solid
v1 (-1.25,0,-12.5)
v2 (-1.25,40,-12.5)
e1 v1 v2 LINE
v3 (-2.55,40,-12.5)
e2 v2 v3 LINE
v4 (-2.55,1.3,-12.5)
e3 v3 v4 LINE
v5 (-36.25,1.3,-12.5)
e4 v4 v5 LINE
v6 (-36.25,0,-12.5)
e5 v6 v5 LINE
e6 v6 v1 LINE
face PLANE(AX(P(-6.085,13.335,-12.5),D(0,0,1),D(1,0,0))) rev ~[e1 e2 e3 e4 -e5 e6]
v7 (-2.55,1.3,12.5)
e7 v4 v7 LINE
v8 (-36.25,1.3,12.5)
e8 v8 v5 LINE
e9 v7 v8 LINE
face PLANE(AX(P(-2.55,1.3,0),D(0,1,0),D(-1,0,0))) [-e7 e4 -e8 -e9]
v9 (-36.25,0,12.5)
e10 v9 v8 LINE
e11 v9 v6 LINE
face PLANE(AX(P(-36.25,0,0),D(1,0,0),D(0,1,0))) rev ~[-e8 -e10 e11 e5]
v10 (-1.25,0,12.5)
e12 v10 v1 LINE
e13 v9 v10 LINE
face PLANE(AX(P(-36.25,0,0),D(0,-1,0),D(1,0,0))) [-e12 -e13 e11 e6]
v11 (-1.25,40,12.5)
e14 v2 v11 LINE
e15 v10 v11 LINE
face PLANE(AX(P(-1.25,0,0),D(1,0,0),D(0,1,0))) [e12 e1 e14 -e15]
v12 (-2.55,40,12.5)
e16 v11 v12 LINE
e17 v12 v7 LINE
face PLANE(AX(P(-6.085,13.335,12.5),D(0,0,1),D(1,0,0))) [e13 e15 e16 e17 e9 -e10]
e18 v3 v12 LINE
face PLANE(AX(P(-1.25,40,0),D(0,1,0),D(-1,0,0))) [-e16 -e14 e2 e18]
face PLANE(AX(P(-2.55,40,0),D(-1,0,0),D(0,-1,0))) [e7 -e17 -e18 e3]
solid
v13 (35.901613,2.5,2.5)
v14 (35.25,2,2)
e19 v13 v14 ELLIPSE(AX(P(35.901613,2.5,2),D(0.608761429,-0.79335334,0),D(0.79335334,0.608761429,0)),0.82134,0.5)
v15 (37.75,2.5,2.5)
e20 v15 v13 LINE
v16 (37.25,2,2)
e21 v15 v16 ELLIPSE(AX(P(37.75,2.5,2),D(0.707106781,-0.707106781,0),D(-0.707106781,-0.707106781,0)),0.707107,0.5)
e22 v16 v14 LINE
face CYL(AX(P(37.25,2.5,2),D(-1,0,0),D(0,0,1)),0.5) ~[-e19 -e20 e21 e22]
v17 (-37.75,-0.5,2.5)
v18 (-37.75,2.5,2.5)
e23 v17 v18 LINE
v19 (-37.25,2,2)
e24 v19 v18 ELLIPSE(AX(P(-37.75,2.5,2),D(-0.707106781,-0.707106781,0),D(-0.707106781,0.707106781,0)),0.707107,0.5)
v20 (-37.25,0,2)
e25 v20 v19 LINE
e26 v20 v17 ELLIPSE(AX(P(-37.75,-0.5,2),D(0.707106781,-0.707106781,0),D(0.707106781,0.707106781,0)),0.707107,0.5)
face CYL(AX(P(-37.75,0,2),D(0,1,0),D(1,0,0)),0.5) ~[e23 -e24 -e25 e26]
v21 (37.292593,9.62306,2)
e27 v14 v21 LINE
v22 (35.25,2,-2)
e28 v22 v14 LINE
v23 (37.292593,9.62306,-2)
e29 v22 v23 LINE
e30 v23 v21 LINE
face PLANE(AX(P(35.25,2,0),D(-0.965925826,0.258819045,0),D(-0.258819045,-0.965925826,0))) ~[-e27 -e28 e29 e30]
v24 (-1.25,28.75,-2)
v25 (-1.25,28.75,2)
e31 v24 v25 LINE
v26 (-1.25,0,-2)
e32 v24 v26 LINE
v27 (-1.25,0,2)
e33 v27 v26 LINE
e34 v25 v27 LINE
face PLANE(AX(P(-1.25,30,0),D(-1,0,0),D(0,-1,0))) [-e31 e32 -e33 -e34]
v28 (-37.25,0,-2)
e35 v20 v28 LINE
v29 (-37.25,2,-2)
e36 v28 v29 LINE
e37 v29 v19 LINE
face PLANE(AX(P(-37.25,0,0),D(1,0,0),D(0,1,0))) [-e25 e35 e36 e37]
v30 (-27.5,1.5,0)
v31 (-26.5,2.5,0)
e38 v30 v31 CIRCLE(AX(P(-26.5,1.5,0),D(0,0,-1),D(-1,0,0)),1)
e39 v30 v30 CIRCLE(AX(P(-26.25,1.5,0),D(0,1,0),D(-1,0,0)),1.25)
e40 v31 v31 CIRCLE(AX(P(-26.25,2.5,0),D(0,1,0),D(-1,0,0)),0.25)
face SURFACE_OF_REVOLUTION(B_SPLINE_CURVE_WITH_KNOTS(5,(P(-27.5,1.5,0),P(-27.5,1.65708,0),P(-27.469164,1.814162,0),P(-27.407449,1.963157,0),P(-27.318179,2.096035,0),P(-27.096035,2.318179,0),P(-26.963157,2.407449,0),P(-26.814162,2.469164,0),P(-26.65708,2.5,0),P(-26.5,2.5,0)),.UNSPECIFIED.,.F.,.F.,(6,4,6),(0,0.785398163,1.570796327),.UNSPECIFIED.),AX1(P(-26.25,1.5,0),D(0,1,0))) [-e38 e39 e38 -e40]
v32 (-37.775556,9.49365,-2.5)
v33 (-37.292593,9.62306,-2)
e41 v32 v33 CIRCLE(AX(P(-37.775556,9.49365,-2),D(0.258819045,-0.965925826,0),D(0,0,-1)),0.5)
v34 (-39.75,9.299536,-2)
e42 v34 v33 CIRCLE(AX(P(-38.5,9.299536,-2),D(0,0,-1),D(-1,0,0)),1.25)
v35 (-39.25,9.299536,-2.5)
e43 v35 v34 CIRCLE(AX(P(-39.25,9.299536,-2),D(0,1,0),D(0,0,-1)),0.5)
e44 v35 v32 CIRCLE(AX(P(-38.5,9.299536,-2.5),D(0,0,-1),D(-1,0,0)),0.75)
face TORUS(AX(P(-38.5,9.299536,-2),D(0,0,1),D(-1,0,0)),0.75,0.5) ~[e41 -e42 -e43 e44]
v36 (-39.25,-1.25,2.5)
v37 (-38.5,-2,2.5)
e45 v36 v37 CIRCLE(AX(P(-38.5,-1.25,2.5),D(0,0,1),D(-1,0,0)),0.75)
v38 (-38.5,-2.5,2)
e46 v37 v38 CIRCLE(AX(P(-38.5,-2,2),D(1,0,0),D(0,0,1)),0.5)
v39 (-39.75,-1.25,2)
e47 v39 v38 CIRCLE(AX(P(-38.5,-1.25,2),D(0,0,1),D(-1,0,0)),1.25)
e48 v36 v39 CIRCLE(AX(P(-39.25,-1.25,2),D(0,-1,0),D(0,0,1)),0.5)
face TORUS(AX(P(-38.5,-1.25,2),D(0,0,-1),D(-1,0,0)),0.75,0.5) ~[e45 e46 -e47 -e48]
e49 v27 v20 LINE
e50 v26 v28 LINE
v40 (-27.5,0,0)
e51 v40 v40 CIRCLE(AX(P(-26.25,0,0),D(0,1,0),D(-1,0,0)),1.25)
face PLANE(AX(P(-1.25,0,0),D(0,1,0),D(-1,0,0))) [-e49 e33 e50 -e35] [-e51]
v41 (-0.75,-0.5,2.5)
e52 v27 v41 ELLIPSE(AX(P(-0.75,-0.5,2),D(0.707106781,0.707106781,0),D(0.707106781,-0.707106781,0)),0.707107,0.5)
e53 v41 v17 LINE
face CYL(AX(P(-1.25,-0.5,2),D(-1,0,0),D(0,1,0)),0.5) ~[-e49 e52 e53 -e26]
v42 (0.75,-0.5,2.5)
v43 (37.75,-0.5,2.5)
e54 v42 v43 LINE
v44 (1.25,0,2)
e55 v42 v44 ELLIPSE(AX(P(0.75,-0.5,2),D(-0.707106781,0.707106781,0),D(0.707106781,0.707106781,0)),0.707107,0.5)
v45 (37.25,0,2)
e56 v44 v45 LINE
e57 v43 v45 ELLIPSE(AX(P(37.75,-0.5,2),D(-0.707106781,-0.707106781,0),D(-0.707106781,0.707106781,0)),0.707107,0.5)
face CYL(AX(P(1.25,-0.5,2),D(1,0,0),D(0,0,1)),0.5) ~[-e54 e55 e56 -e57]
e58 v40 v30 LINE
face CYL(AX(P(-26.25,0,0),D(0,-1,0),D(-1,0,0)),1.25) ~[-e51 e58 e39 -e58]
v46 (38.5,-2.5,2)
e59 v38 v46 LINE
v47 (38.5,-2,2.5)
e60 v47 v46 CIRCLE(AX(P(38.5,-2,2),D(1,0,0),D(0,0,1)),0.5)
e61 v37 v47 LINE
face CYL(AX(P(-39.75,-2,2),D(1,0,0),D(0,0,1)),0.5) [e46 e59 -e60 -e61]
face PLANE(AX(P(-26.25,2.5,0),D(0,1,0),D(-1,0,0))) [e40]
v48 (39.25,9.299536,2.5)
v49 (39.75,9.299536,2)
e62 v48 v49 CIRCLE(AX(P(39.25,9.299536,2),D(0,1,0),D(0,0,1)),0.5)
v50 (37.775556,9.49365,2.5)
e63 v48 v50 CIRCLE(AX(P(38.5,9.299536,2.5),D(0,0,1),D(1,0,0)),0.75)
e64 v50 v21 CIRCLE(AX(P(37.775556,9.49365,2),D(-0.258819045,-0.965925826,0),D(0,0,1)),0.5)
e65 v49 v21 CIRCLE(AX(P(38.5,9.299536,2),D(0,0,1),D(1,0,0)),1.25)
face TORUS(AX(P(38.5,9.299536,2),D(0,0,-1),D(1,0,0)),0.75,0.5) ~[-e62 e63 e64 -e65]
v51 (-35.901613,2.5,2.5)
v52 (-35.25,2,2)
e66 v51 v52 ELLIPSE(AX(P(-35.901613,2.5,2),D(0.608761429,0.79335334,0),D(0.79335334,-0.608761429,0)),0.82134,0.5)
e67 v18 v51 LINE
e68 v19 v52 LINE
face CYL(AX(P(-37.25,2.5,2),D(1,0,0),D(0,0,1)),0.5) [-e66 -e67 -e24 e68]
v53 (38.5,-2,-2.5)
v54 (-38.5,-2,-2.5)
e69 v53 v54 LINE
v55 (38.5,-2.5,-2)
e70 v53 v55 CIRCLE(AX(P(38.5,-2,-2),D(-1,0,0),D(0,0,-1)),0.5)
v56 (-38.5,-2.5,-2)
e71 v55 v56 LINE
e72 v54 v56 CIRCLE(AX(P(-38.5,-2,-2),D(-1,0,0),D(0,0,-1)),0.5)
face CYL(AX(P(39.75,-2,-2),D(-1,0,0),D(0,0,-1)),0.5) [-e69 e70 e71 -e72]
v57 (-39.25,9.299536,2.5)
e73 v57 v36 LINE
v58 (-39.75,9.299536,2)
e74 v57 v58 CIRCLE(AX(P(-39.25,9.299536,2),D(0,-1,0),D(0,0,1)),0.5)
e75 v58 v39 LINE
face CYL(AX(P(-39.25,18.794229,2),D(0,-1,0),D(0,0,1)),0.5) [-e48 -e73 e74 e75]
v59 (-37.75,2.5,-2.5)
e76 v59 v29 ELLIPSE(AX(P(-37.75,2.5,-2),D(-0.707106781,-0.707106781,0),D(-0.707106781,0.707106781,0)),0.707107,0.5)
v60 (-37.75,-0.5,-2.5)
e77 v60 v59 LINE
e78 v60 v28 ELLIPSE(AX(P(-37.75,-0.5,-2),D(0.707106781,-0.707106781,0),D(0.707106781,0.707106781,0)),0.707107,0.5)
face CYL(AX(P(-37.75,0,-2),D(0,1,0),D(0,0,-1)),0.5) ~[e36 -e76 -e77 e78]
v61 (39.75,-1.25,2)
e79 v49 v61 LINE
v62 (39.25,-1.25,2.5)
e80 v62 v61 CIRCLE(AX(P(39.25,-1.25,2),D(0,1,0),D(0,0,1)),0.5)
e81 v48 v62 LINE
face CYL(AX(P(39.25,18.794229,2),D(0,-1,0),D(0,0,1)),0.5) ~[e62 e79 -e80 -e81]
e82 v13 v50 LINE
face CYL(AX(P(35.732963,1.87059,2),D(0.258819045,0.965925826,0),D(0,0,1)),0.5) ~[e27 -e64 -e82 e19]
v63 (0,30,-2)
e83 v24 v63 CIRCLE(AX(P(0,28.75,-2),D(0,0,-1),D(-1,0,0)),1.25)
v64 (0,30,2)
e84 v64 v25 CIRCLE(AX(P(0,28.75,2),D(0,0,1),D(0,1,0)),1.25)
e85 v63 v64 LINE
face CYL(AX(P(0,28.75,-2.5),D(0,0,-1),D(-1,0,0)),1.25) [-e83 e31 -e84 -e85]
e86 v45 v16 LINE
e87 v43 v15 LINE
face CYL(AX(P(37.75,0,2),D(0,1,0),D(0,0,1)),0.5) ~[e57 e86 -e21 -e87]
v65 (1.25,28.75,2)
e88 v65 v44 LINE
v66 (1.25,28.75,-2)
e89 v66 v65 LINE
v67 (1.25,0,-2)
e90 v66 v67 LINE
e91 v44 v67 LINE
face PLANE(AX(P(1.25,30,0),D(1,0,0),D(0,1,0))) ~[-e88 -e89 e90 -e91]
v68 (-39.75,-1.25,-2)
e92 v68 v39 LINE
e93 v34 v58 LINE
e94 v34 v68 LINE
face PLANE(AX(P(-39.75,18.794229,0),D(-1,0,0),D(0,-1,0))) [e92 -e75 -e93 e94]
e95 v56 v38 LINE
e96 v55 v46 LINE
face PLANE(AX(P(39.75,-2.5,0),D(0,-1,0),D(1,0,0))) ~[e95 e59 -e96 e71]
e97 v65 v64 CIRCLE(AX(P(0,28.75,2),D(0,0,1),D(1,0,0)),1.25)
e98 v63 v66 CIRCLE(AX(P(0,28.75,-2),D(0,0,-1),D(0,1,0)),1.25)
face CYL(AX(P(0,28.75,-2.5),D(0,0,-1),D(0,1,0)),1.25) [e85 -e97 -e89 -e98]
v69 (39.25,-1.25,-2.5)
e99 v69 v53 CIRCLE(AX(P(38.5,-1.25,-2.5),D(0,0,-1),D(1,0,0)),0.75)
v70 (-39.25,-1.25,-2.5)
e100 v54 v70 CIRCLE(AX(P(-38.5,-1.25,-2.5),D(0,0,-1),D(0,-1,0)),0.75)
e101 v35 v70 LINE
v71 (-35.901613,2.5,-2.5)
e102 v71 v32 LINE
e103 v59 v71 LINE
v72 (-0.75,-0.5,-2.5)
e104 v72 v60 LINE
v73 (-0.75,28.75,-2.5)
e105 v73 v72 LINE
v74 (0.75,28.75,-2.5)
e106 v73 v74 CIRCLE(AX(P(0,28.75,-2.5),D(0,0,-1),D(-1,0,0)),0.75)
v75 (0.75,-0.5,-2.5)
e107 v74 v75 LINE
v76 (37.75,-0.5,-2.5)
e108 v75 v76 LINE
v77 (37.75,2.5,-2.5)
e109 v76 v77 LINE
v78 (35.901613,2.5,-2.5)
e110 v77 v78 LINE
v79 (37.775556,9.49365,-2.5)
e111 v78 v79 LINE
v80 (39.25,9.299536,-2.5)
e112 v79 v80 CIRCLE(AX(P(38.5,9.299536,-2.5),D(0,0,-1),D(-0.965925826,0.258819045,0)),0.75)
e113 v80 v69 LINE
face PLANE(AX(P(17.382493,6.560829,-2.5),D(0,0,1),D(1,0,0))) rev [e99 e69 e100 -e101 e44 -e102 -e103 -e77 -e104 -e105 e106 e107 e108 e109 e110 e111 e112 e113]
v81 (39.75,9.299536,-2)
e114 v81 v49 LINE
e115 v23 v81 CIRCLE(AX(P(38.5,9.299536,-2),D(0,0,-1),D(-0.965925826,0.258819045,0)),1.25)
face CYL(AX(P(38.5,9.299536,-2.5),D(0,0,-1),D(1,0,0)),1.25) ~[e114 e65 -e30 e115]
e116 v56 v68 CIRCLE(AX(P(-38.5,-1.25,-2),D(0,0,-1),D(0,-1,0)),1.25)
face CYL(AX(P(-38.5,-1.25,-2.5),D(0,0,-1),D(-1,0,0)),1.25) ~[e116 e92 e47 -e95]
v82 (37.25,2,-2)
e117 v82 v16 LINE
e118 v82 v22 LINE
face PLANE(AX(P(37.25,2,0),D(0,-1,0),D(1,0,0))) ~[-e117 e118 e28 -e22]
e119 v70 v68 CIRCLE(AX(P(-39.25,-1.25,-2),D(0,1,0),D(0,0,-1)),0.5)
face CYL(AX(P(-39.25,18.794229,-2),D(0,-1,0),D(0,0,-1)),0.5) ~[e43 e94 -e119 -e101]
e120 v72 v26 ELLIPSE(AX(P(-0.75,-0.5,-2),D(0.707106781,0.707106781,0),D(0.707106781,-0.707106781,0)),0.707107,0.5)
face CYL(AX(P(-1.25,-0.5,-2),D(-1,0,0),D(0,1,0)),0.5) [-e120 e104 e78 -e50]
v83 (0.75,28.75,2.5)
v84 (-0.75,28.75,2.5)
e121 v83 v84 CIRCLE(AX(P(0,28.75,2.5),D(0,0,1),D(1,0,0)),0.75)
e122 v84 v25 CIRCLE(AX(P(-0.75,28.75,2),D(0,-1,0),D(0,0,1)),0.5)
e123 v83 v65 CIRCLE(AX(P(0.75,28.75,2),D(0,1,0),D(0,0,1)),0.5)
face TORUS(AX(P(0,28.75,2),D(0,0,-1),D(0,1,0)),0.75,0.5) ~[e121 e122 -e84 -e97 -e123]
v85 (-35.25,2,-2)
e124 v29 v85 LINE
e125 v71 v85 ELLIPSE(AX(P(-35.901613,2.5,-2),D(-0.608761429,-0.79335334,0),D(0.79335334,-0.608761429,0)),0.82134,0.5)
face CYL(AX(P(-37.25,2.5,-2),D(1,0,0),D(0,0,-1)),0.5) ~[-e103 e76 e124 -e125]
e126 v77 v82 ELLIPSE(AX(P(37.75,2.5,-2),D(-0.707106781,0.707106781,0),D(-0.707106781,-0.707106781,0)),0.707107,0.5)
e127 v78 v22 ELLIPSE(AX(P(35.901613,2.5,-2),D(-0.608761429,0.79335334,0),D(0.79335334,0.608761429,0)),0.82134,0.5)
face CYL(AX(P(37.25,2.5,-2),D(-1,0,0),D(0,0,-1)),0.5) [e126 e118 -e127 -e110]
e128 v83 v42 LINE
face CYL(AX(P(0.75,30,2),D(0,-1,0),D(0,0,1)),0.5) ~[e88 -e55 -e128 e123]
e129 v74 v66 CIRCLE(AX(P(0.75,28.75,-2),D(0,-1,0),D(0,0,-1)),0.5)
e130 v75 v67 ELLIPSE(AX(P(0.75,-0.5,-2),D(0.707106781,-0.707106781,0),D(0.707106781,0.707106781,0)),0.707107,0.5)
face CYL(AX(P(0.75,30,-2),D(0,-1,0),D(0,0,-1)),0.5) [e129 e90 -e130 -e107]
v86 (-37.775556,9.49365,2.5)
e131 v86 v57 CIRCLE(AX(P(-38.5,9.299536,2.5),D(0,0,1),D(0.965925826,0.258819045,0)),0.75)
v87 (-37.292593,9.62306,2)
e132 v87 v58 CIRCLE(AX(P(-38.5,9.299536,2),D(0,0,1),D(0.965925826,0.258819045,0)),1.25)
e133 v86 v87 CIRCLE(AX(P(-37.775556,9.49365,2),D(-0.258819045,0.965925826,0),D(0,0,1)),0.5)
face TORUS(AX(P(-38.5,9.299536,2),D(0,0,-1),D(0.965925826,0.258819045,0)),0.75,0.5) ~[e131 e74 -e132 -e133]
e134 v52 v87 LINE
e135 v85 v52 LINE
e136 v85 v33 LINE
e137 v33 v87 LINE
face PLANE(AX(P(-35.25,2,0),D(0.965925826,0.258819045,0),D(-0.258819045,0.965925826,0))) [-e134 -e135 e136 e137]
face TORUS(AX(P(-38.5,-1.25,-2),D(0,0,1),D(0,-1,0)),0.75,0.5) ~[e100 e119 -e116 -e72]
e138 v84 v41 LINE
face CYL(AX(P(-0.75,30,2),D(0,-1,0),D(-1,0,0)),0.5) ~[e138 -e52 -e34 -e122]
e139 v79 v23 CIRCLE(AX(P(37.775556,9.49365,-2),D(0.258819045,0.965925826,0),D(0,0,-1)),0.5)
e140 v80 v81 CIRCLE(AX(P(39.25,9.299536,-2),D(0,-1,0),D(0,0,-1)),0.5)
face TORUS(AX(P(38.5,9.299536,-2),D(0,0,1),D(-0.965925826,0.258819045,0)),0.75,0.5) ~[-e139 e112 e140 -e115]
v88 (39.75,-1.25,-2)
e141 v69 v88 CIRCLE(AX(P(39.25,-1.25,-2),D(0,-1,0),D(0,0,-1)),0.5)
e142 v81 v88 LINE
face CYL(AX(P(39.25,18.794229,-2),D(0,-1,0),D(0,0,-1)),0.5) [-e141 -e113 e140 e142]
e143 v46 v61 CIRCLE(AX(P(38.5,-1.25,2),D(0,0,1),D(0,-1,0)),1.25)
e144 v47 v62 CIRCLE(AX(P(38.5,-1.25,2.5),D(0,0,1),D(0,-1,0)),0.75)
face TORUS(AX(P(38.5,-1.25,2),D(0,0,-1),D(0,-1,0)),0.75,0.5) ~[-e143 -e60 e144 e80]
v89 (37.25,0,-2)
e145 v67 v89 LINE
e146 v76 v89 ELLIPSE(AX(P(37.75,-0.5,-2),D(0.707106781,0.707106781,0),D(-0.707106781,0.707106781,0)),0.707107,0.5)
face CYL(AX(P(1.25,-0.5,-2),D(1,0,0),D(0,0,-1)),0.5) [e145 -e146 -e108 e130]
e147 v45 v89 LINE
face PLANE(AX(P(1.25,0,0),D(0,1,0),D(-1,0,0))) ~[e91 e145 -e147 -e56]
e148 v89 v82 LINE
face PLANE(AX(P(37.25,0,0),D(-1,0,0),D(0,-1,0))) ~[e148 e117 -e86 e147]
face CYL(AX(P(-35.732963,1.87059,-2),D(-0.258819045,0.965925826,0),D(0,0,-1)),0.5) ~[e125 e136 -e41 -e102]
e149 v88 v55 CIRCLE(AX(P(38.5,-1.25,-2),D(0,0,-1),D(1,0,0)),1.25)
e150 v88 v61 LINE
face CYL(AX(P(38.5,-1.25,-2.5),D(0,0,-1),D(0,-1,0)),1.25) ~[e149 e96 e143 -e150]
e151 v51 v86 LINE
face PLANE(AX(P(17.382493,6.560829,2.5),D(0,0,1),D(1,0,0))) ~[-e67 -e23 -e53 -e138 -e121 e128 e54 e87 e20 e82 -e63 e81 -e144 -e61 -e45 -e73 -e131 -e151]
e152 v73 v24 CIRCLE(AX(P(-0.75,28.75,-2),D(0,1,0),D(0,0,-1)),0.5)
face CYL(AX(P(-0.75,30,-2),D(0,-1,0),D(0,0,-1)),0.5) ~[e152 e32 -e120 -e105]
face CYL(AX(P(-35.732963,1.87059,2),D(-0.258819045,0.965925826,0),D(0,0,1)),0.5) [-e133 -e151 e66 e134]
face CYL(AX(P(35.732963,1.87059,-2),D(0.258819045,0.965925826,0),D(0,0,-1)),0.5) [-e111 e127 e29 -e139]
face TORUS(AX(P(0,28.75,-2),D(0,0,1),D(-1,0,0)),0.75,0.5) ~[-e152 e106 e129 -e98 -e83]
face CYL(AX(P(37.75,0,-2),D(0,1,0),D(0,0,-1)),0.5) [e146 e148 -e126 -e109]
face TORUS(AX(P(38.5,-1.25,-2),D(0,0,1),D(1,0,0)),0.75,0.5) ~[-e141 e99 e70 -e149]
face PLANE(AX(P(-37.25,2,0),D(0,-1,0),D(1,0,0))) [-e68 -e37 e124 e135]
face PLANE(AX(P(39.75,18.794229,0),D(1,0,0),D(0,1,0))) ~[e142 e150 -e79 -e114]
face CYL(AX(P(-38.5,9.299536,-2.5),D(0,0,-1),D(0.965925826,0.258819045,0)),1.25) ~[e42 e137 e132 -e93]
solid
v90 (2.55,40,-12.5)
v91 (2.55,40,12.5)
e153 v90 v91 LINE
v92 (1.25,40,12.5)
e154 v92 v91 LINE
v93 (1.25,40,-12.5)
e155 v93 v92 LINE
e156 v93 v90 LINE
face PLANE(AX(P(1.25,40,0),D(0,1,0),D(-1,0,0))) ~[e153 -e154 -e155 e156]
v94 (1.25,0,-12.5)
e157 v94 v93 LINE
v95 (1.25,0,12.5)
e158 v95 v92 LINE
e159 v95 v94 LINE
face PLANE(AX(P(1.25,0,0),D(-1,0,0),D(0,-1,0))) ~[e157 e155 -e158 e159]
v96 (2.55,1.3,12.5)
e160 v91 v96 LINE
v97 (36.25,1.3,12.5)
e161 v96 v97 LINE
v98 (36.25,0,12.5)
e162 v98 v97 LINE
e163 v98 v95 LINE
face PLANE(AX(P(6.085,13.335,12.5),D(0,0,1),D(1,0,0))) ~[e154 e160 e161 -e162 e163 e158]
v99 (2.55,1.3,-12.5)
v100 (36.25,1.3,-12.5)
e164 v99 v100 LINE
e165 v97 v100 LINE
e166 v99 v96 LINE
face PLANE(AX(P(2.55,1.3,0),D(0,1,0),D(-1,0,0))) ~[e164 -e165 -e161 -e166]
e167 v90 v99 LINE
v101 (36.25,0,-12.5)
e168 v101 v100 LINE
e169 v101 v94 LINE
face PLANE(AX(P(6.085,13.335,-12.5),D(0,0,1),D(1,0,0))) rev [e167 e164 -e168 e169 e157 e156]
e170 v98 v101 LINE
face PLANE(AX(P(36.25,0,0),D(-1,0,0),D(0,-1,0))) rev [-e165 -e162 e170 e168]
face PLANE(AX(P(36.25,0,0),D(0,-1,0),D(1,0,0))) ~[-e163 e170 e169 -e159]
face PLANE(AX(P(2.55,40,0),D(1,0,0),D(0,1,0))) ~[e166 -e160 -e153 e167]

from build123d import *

# Parameters (mm, degrees)
F2_DEPTH     = 2.5
F4_R         = 1.25
F5_DEPTH     = 2.5
F6_R         = 1
F7_R         = 0.5
F8_T1_DEPTH  = 5
F8_T4_ANGLE  = 90
F8_T6_ANGLE  = 90
F8_T8_ANGLE  = 90
F8_T10_ANGLE = 90
F8_T12_ANGLE = 165
F8_T14_ANGLE = 165
F8_T16_ANGLE = 165
F8_T18_ANGLE = 165
F8_T20_ANGLE = 90
F8_T22_ANGLE = 90
F8_T24_ANGLE = 90
F8_T26_ANGLE = 90
F0_W         = 8
F0_H         = 1.3
F0_W_2       = 4
F9_DEPTH     = 12.5


# Not quite as in the source:
# - a fillet or chamfer that OpenCascade refuses, or shapes differently, is made with other operations: its cross-section is extruded or revolved along the edge and cut away or added


with BuildPart() as f2:
    # F1 (on Top) → F2 (new body, symmetric)
    with BuildSketch(Plane.XY):
        Polygon((-37.25, 0), (-37.25, 2), (-35.25, 2), (-39.75, 18.7942286341), (-39.75, -2.5), (0, -2.5), (0, 30), (-1.25, 30), (-1.25, 0), align=None)
    extrude(amount=F2_DEPTH, both=True)

    # F3: F2 across plane


with BuildPart() as f2_1:
    add(f2.part)
    add(f2.part.mirror(Plane.YZ))

    # F4 (on face) → F5 (join)
    with BuildSketch(Plane(origin=(0, 0, 0), x_dir=(-1, 0, 0), z_dir=(0, 1, 0))):
        with Locations((26.25, 0)):
            Circle(F4_R)
    extrude(amount=F5_DEPTH)

    # F6
    f6_edges = [f2_1.edges().sort_by_distance(p)[0] for p in [
        (-25, 2.5, 0),
    ]]
    fillet(f6_edges, radius=F6_R)

    # F7
    f7_edges = [f2_1.edges().sort_by_distance(p)[0] for p in [
        (-37.25, 1, -2.5),
        (-36.25, 2, -2.5),
        (-37.5, 10.397114, -2.5),
        (-39.75, 8.147114, -2.5),
        (0, -2.5, -2.5),
        (39.75, 8.147114, -2.5),
        (37.5, 10.397114, -2.5),
        (36.25, 2, -2.5),
        (37.25, 1, -2.5),
        (19.25, 0, -2.5),
        (1.25, 15, -2.5),
        (0, 30, -2.5),
        (-1.25, 15, -2.5),
        (-19.25, 0, -2.5),
        (-37.25, 1, 2.5),
        (-36.25, 2, 2.5),
        (-37.5, 10.397114, 2.5),
        (-39.75, 8.147114, 2.5),
        (0, -2.5, 2.5),
        (39.75, 8.147114, 2.5),
        (37.5, 10.397114, 2.5),
        (36.25, 2, 2.5),
        (37.25, 1, 2.5),
        (19.25, 0, 2.5),
        (1.25, 15, 2.5),
        (0, 30, 2.5),
        (-1.25, 15, 2.5),
        (-19.25, 0, 2.5),
    ]]
    fillet(f7_edges, radius=F7_R)

    # F8: fillet of radius 1.25 on 6 edges, made by hand

    # F8_s2 → F8_t1 (cut)
    with BuildSketch(Plane.XY.offset(-2.5)):
        with BuildLine():
            ThreePointArc((0, 30), (0.8838834765, 29.6338834765), (1.25, 28.75))
            Line((1.25, 28.75), (1.25, 30))
            Line((1.25, 30), (0, 30))
        make_face()
        with BuildLine():
            ThreePointArc((-1.25, 28.75), (-0.8838834765, 29.6338834765), (0, 30))
            Line((0, 30), (-1.25, 30))
            Line((-1.25, 30), (-1.25, 28.75))
        make_face()
        with BuildLine():
            ThreePointArc((-37.2925927171, 9.6230597995), (-38.6631577403, 10.5388420699), (-39.75, 9.2995359932))
            Line((-39.75, 9.2995359932), (-39.75, 18.7942286341))
            Line((-39.75, 18.7942286341), (-37.2925927171, 9.6230597995))
        make_face()
        with BuildLine():
            ThreePointArc((39.75, 9.2995359932), (38.6631577403, 10.5388420699), (37.2925927171, 9.6230597995))
            Line((37.2925927171, 9.6230597995), (39.75, 18.7942286341))
            Line((39.75, 18.7942286341), (39.75, 9.2995359932))
        make_face()
        with BuildLine():
            ThreePointArc((38.5, -2.5), (39.3838834765, -2.1338834765), (39.75, -1.25))
            Line((39.75, -1.25), (39.75, -2.5))
            Line((39.75, -2.5), (38.5, -2.5))
        make_face()
        with BuildLine():
            ThreePointArc((-39.75, -1.25), (-39.3838834765, -2.1338834765), (-38.5, -2.5))
            Line((-38.5, -2.5), (-39.75, -2.5))
            Line((-39.75, -2.5), (-39.75, -1.25))
        make_face()
    extrude(amount=F8_T1_DEPTH, mode=Mode.SUBTRACT)

    # F8_s3 → F8_t4 (revolve, cut)
    with BuildSketch(Plane.YZ.offset(-38.5)):
        with BuildLine():
            ThreePointArc((-2, -2.5), (-2.3535533906, -2.3535533906), (-2.5, -2))
            Line((-2.5, -2), (-2.5, -2.5))
            Line((-2.5, -2.5), (-2, -2.5))
        make_face()
    revolve(axis=Axis((-38.5, -1.25, -2.5), (0, 0, -1)), revolution_arc=F8_T4_ANGLE, mode=Mode.SUBTRACT)

    # F8_s5 → F8_t6 (revolve, cut)
    with BuildSketch(Plane.XZ.offset(1.25)):
        with BuildLine():
            ThreePointArc((-39.25, 2.5), (-39.6035533906, 2.3535533906), (-39.75, 2))
            Line((-39.75, 2), (-39.75, 2.5))
            Line((-39.75, 2.5), (-39.25, 2.5))
        make_face()
    revolve(axis=Axis((-38.5, -1.25, 2.5), (0, 0, 1)), revolution_arc=F8_T6_ANGLE, mode=Mode.SUBTRACT)

    # F8_s7 → F8_t8 (revolve, cut)
    with BuildSketch(Plane.XZ.offset(1.25)):
        with BuildLine():
            ThreePointArc((39.25, -2.5), (39.6035533906, -2.3535533906), (39.75, -2))
            Line((39.75, -2), (39.75, -2.5))
            Line((39.75, -2.5), (39.25, -2.5))
        make_face()
    revolve(axis=Axis((38.5, -1.25, -2.5), (0, 0, -1)), revolution_arc=F8_T8_ANGLE, mode=Mode.SUBTRACT)

    # F8_s9 → F8_t10 (revolve, cut)
    with BuildSketch(Plane.YZ.offset(38.5)):
        with BuildLine():
            ThreePointArc((-2, 2.5), (-2.3535533906, 2.3535533906), (-2.5, 2))
            Line((-2.5, 2), (-2.5, 2.5))
            Line((-2.5, 2.5), (-2, 2.5))
        make_face()
    revolve(axis=Axis((38.5, -1.25, 2.5), (0, 0, 1)), revolution_arc=F8_T10_ANGLE, mode=Mode.SUBTRACT)

    # F8_s11 → F8_t12 (revolve, cut)
    with BuildSketch(Plane(origin=(4.9038949754, 18.3015852033, 0), x_dir=(0, 0, 1), z_dir=(-0.2588190451, -0.9659258263, 0))):
        with BuildLine():
            ThreePointArc((-2.5, -34.0312472865), (-2.3535533906, -33.6776938959), (-2, -33.5312472865))
            Line((-2, -33.5312472865), (-2.5, -33.5312472865))
            Line((-2.5, -33.5312472865), (-2.5, -34.0312472865))
        make_face()
    revolve(axis=Axis((38.5, 9.2995359932, -2.5), (0, 0, -1)), revolution_arc=F8_T12_ANGLE, mode=Mode.SUBTRACT)

    # F8_s13 → F8_t14 (revolve, cut)
    with BuildSketch(Plane.XZ.offset(-9.2995359932)):
        with BuildLine():
            ThreePointArc((39.25, 2.5), (39.6035533906, 2.3535533906), (39.75, 2))
            Line((39.75, 2), (39.75, 2.5))
            Line((39.75, 2.5), (39.25, 2.5))
        make_face()
    revolve(axis=Axis((38.5, 9.2995359932, 2.5), (0, 0, 1)), revolution_arc=F8_T14_ANGLE, mode=Mode.SUBTRACT)

    # F8_s15 → F8_t16 (revolve, cut)
    with BuildSketch(Plane.XZ.offset(-9.2995359932)):
        with BuildLine():
            ThreePointArc((-39.25, -2.5), (-39.6035533906, -2.3535533906), (-39.75, -2))
            Line((-39.75, -2), (-39.75, -2.5))
            Line((-39.75, -2.5), (-39.25, -2.5))
        make_face()
    revolve(axis=Axis((-38.5, 9.2995359932, -2.5), (0, 0, -1)), revolution_arc=F8_T16_ANGLE, mode=Mode.SUBTRACT)

    # F8_s17 → F8_t18 (revolve, cut)
    with BuildSketch(Plane(origin=(-4.9038949754, 18.3015852033, 0), x_dir=(0, 0, 1), z_dir=(0.2588190451, -0.9659258263, 0))):
        with BuildLine():
            ThreePointArc((2.5, 34.0312472865), (2.3535533906, 33.6776938959), (2, 33.5312472865))
            Line((2, 33.5312472865), (2.5, 33.5312472865))
            Line((2.5, 33.5312472865), (2.5, 34.0312472865))
        make_face()
    revolve(axis=Axis((-38.5, 9.2995359932, 2.5), (0, 0, 1)), revolution_arc=F8_T18_ANGLE, mode=Mode.SUBTRACT)

    # F8_s19 → F8_t20 (revolve, cut)
    with BuildSketch(Plane.YZ):
        with BuildLine():
            ThreePointArc((29.5, 2.5), (29.8535533906, 2.3535533906), (30, 2))
            Line((30, 2), (30, 2.5))
            Line((30, 2.5), (29.5, 2.5))
        make_face()
    revolve(axis=Axis((0, 28.75, 2.5), (0, 0, 1)), revolution_arc=F8_T20_ANGLE, mode=Mode.SUBTRACT)

    # F8_s21 → F8_t22 (revolve, cut)
    with BuildSketch(Plane.XZ.offset(-28.75)):
        with BuildLine():
            ThreePointArc((-0.75, -2.5), (-1.1035533906, -2.3535533906), (-1.25, -2))
            Line((-1.25, -2), (-1.25, -2.5))
            Line((-1.25, -2.5), (-0.75, -2.5))
        make_face()
    revolve(axis=Axis((0, 28.75, -2.5), (0, 0, -1)), revolution_arc=F8_T22_ANGLE, mode=Mode.SUBTRACT)

    # F8_s23 → F8_t24 (revolve, cut)
    with BuildSketch(Plane.XZ.offset(-28.75)):
        with BuildLine():
            ThreePointArc((0.75, 2.5), (1.1035533906, 2.3535533906), (1.25, 2))
            Line((1.25, 2), (1.25, 2.5))
            Line((1.25, 2.5), (0.75, 2.5))
        make_face()
    revolve(axis=Axis((0, 28.75, 2.5), (0, 0, 1)), revolution_arc=F8_T24_ANGLE, mode=Mode.SUBTRACT)

    # F8_s25 → F8_t26 (revolve, cut)
    with BuildSketch(Plane.YZ):
        with BuildLine():
            ThreePointArc((29.5, -2.5), (29.8535533906, -2.3535533906), (30, -2))
            Line((30, -2), (30, -2.5))
            Line((30, -2.5), (29.5, -2.5))
        make_face()
    revolve(axis=Axis((0, 28.75, -2.5), (0, 0, -1)), revolution_arc=F8_T26_ANGLE, mode=Mode.SUBTRACT)


with BuildPart() as f9:
    # F0 (on Top) → F9 (new body, symmetric)
    with BuildSketch(Plane.XY):
        Polygon((-24.25, 0), (-1.25, 0), (-1.25, 40), (-2.55, 40), (-2.55, 1.3), (-24.25, 1.3), align=None)
        with Locations((-32.25, 0.65)):
            Rectangle(F0_W, F0_H)
        with Locations((-26.25, 0.65)):
            Rectangle(F0_W_2, F0_H)
    extrude(amount=F9_DEPTH, both=True)


with BuildPart() as f10_1:
    # F10: instance of F9
    add(f9.part.mirror(Plane.YZ))


solid = Compound([f2_1.part, f9.part, f10_1.part])
